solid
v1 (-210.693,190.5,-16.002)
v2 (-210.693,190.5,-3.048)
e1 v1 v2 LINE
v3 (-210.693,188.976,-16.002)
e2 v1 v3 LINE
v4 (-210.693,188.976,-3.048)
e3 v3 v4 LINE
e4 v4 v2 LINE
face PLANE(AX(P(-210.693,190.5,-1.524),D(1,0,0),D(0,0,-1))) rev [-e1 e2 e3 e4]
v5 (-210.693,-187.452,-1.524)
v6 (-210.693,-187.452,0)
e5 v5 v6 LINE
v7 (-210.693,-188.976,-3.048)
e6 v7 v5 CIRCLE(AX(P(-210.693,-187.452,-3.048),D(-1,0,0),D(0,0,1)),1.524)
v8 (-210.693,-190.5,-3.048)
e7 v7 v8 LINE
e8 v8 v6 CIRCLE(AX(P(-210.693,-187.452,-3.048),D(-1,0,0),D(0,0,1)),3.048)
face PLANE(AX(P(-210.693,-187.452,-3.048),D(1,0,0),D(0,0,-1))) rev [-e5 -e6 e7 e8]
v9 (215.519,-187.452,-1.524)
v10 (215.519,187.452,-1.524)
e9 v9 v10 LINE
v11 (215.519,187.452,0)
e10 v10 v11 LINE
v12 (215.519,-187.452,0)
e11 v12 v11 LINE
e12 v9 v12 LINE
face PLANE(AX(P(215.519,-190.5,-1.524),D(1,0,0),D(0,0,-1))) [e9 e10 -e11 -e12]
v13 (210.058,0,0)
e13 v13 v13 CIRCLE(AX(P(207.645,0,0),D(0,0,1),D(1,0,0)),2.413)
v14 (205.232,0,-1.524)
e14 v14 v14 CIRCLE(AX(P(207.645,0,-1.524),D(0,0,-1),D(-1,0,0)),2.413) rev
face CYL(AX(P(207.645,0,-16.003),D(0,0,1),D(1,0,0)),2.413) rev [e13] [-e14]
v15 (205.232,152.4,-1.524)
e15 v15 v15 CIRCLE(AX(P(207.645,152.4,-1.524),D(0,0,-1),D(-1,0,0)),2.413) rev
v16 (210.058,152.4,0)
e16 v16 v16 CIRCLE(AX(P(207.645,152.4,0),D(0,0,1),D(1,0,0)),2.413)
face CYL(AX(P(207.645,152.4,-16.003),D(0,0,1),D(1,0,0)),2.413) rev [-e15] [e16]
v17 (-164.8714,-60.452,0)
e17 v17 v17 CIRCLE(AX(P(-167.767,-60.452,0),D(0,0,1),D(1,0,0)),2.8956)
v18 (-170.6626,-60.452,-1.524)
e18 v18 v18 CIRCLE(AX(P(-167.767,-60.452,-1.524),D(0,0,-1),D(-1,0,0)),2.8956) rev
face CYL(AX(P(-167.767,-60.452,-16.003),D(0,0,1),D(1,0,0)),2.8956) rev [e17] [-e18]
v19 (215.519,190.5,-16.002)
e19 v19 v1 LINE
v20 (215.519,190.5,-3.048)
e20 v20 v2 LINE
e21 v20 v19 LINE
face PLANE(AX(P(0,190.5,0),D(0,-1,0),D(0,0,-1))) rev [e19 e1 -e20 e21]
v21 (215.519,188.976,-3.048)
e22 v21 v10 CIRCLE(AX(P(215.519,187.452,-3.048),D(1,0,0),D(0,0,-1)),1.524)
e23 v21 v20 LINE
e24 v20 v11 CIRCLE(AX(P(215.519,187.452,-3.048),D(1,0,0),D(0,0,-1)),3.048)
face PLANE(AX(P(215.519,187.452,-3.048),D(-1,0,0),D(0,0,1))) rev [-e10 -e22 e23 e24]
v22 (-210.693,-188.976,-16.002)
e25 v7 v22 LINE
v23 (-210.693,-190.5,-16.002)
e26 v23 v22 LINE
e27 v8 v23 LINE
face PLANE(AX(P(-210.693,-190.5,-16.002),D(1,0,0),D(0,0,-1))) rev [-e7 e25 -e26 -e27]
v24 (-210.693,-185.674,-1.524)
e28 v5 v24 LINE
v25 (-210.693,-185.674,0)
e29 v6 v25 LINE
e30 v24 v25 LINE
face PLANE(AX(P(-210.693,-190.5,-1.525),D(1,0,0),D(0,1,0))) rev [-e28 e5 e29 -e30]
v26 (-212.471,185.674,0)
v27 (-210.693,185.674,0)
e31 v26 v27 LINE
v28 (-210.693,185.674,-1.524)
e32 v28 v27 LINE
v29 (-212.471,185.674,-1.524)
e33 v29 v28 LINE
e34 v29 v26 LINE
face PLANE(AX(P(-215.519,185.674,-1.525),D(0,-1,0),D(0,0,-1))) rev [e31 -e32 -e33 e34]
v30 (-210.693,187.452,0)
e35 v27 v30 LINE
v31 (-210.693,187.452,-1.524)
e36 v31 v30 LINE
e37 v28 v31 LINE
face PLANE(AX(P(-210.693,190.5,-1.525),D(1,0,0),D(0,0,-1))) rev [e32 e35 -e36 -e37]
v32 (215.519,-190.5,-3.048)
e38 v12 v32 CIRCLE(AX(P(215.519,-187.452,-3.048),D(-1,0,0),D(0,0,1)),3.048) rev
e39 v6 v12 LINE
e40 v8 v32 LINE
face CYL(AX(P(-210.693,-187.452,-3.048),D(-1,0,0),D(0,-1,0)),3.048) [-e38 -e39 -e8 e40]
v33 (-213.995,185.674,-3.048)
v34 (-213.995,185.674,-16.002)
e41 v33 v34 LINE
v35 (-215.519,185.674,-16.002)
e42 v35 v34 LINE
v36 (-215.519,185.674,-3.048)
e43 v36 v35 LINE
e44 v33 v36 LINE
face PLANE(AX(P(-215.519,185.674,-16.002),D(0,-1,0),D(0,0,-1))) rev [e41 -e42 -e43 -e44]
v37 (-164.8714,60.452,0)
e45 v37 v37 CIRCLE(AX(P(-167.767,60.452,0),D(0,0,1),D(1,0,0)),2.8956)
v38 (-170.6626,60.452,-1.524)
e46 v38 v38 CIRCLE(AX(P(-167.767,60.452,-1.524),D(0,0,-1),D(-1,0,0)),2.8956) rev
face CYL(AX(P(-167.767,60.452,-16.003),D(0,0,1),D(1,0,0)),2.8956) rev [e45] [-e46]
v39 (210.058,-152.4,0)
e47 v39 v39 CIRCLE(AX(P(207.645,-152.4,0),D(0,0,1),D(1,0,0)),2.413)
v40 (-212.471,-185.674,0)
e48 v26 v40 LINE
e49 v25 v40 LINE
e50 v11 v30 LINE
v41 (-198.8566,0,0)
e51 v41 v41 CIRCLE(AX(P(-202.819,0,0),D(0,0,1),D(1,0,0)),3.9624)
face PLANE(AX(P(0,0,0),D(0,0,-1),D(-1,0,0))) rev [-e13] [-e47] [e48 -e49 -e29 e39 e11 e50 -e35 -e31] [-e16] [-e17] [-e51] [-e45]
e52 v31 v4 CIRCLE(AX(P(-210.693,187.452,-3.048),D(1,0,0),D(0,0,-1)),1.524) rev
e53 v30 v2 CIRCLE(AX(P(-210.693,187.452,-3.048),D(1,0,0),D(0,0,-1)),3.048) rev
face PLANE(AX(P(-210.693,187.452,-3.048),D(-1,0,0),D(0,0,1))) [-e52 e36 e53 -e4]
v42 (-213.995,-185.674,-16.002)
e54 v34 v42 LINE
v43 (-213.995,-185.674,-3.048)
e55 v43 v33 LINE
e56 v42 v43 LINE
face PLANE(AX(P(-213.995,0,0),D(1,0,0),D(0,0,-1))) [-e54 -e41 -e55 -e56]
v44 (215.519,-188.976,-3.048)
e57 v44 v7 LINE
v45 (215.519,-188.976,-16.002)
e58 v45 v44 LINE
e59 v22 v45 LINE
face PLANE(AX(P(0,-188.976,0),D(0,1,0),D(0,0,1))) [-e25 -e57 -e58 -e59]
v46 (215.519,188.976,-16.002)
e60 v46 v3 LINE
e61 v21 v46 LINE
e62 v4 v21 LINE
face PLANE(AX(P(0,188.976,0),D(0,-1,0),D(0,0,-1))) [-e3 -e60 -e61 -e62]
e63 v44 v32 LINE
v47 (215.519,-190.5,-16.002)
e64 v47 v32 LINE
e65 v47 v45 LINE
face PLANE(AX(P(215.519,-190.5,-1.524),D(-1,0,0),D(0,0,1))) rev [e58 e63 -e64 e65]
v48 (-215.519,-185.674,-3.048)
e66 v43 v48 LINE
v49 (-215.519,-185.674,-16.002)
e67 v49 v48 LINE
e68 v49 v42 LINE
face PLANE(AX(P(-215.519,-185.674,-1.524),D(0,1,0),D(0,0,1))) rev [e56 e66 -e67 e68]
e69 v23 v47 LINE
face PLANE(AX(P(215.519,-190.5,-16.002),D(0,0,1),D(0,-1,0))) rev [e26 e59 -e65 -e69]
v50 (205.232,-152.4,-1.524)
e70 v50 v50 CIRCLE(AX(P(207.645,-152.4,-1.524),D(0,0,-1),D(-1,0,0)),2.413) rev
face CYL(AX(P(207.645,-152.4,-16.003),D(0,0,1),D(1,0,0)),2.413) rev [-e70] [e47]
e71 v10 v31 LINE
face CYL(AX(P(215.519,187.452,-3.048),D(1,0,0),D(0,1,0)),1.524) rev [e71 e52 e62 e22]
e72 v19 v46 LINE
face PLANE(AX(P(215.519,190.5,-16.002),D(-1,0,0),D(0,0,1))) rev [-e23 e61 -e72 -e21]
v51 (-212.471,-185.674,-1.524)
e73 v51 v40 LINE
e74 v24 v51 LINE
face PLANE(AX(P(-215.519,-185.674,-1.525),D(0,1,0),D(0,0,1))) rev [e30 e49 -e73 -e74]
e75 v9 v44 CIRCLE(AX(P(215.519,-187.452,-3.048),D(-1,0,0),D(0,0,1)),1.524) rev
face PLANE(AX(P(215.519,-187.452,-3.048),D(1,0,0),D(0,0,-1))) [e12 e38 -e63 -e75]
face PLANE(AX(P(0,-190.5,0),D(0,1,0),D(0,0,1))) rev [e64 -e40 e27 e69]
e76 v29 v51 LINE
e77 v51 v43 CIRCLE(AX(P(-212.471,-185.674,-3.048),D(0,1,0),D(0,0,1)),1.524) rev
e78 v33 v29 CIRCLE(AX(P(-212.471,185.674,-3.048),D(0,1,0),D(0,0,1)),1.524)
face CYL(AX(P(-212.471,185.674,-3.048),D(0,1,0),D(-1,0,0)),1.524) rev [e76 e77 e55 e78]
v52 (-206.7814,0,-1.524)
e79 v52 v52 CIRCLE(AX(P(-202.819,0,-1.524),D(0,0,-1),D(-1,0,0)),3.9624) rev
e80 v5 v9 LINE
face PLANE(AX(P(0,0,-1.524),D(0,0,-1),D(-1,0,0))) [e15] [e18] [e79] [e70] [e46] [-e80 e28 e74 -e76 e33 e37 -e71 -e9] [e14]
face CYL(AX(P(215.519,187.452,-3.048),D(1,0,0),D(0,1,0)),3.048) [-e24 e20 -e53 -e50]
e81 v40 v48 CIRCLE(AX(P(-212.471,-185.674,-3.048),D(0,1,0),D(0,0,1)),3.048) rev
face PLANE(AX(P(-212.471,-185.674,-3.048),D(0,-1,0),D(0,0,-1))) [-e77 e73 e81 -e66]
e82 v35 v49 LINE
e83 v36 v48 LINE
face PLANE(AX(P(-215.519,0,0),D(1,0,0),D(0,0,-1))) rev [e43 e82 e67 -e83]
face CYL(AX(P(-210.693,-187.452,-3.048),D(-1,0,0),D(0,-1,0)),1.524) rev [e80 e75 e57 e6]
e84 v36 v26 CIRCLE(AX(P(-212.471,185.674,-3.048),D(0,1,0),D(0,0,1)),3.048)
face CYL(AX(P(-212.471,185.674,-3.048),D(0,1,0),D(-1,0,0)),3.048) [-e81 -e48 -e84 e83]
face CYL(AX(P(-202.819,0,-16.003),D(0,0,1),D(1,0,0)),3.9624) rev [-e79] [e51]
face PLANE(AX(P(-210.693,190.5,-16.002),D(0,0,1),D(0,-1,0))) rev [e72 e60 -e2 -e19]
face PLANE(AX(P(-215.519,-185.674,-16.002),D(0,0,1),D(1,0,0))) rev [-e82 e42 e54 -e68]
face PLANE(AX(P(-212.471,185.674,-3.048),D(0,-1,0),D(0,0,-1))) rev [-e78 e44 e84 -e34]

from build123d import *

# Parameters (mm, degrees)
CROQUIS1_W                         = 431.038
CROQUIS1_H                         = 381
BRIDA_BASE1_DEPTH                  = 1.524
CORTAR_EXTRUIR1_REACH              = 289.647
CROQUIS6_W                         = 4.826
CROQUIS6_H                         = 4.826
BRIDA_DE_ARISTA1_STRIP_W           = 9.144
BRIDA_DE_ARISTA1_STRIP_H           = 1.524
BRIDA_DE_ARISTA1_STRIP_CUT_DEPTH   = 426.212
BRIDA_DE_ARISTA1_STRIP_2_W         = 9.144
BRIDA_DE_ARISTA1_STRIP_2_H         = 1.524
BRIDA_DE_ARISTA1_STRIP_CUT_2_DEPTH = 426.212
BRIDA_DE_ARISTA1_STRIP_3_W         = 9.144
BRIDA_DE_ARISTA1_STRIP_3_H         = 1.524
BRIDA_DE_ARISTA1_STRIP_CUT_3_DEPTH = 371.348
BRIDA_DE_ARISTA1_DEPTH             = 426.212
BRIDA_DE_ARISTA1_BEND_DEPTH        = 426.212
BRIDA_DE_ARISTA1_BEND_2_DEPTH      = 371.348
CORTAR_EXTRUIR2_REACH              = 290.088
CROQUIS16_R                        = 3.9624
CROQUIS16_R_2                      = 2.8956
CROQUIS16_R_3                      = 2.413


# Sheet-metal steps are written as plain solids
with BuildPart() as part:
    # Croquis1 → Brida base1 (new body)
    with BuildSketch(Plane.XY):
        Rectangle(CROQUIS1_W, CROQUIS1_H)
    extrude(amount=-BRIDA_BASE1_DEPTH)

    # Croquis6 → Cortar-Extruir1 (cut, up to next)
    with BuildSketch(Plane.XY, mode=Mode.PRIVATE) as cortar_extruir1_sk1:
        with Locations((-213.106, 188.087)):
            Rectangle(CROQUIS6_W, CROQUIS6_H)
    cortar_extruir1_tool1 = extrude(cortar_extruir1_sk1.sketch, amount=-CORTAR_EXTRUIR1_REACH, mode=Mode.PRIVATE) & part.part
    # Croquis6 → Cortar-Extruir1 (cut, up to next)
    with BuildSketch(Plane.XY, mode=Mode.PRIVATE) as cortar_extruir1_sk2:
        with Locations((-213.106, -188.087)):
            Rectangle(CROQUIS6_W, CROQUIS6_H)
    cortar_extruir1_tool2 = extrude(cortar_extruir1_sk2.sketch, amount=-CORTAR_EXTRUIR1_REACH, mode=Mode.PRIVATE) & part.part
    add(cortar_extruir1_tool1.solids().sort_by_distance((-213.106, 188.087, 0))[0], mode=Mode.SUBTRACT)
    add(cortar_extruir1_tool2.solids().sort_by_distance((-213.106, -188.087, 0))[0], mode=Mode.SUBTRACT)

    # Brida de arista1 strip (across the edge) → Brida de arista1 strip cut (cut)
    with BuildSketch(Plane(origin=(-210.693, 190.5, -1.524), x_dir=(0, -1, 0), z_dir=(1, 0, 0))):
        with Locations((-1.524, -0.762)):
            Rectangle(BRIDA_DE_ARISTA1_STRIP_W, BRIDA_DE_ARISTA1_STRIP_H)
    extrude(amount=BRIDA_DE_ARISTA1_STRIP_CUT_DEPTH, mode=Mode.SUBTRACT)

    # Brida de arista1 strip 2 (across the edge) → Brida de arista1 strip cut 2 (cut)
    with BuildSketch(Plane(origin=(215.519, -190.5, -1.524), x_dir=(0, 1, 0), z_dir=(-1, 0, 0))):
        with Locations((-1.524, -0.762)):
            Rectangle(BRIDA_DE_ARISTA1_STRIP_2_W, BRIDA_DE_ARISTA1_STRIP_2_H)
    extrude(amount=BRIDA_DE_ARISTA1_STRIP_CUT_2_DEPTH, mode=Mode.SUBTRACT)

    # Brida de arista1 strip 3 (across the edge) → Brida de arista1 strip cut 3 (cut)
    with BuildSketch(Plane(origin=(-215.519, -185.674, -1.524), x_dir=(1, 0, 0), z_dir=(0, 1, 0))):
        with Locations((-1.524, -0.762)):
            Rectangle(BRIDA_DE_ARISTA1_STRIP_3_W, BRIDA_DE_ARISTA1_STRIP_3_H)
    extrude(amount=BRIDA_DE_ARISTA1_STRIP_CUT_3_DEPTH, mode=Mode.SUBTRACT)

    # Brida de arista1 section (across the edge) → Brida de arista1 (add)
    with BuildSketch(Plane(origin=(-210.693, 190.5, -1.524), x_dir=(0, -1, 0), z_dir=(1, 0, 0))):
        with BuildLine():
            Line((0, 1.524), (0, 14.478))
            Line((0, 14.478), (1.524, 14.478))
            Line((1.524, 14.478), (1.524, 1.524))
            ThreePointArc((1.524, 1.524), (1.970369265, 0.446369265), (3.048, 0))
            Line((3.048, 0), (3.048, -1.524))
            ThreePointArc((3.048, -1.524), (0.892738531, -0.631261469), (0, 1.524))
        make_face()
    extrude(amount=BRIDA_DE_ARISTA1_DEPTH)

    # Brida de arista1 section 2 (across the edge) → Brida de arista1 bend (add)
    with BuildSketch(Plane(origin=(215.519, -190.5, -1.524), x_dir=(0, 1, 0), z_dir=(-1, 0, 0))):
        with BuildLine():
            Line((0, 1.524), (0, 14.478))
            Line((0, 14.478), (1.524, 14.478))
            Line((1.524, 14.478), (1.524, 1.524))
            ThreePointArc((1.524, 1.524), (1.970369265, 0.446369265), (3.048, 0))
            Line((3.048, 0), (3.048, -1.524))
            ThreePointArc((3.048, -1.524), (0.892738531, -0.631261469), (0, 1.524))
        make_face()
    extrude(amount=BRIDA_DE_ARISTA1_BEND_DEPTH)

    # Brida de arista1 section 3 (across the edge) → Brida de arista1 bend 2 (add)
    with BuildSketch(Plane(origin=(-215.519, -185.674, -1.524), x_dir=(1, 0, 0), z_dir=(0, 1, 0))):
        with BuildLine():
            Line((0, 1.524), (0, 14.478))
            Line((0, 14.478), (1.524, 14.478))
            Line((1.524, 14.478), (1.524, 1.524))
            ThreePointArc((1.524, 1.524), (1.970369265, 0.446369265), (3.048, 0))
            Line((3.048, 0), (3.048, -1.524))
            ThreePointArc((3.048, -1.524), (0.892738531, -0.631261469), (0, 1.524))
        make_face()
    extrude(amount=BRIDA_DE_ARISTA1_BEND_2_DEPTH)

    # Croquis16 → Cortar-Extruir2 (cut, up to next)
    with BuildSketch(Plane.XY, mode=Mode.PRIVATE) as cortar_extruir2_sk1:
        with Locations((-202.819, 0)):
            Circle(CROQUIS16_R)
    cortar_extruir2_tool1 = extrude(cortar_extruir2_sk1.sketch, amount=-CORTAR_EXTRUIR2_REACH, mode=Mode.PRIVATE) & part.part
    # Croquis16 → Cortar-Extruir2 (cut, up to next)
    with BuildSketch(Plane.XY, mode=Mode.PRIVATE) as cortar_extruir2_sk2:
        with Locations((-167.767, 60.452)):
            Circle(CROQUIS16_R_2)
    cortar_extruir2_tool2 = extrude(cortar_extruir2_sk2.sketch, amount=-CORTAR_EXTRUIR2_REACH, mode=Mode.PRIVATE) & part.part
    # Croquis16 → Cortar-Extruir2 (cut, up to next)
    with BuildSketch(Plane.XY, mode=Mode.PRIVATE) as cortar_extruir2_sk3:
        with Locations((-167.767, -60.452)):
            Circle(CROQUIS16_R_2)
    cortar_extruir2_tool3 = extrude(cortar_extruir2_sk3.sketch, amount=-CORTAR_EXTRUIR2_REACH, mode=Mode.PRIVATE) & part.part
    # Croquis16 → Cortar-Extruir2 (cut, up to next)
    with BuildSketch(Plane.XY, mode=Mode.PRIVATE) as cortar_extruir2_sk4:
        with Locations((207.645, 152.4)):
            Circle(CROQUIS16_R_3)
    cortar_extruir2_tool4 = extrude(cortar_extruir2_sk4.sketch, amount=-CORTAR_EXTRUIR2_REACH, mode=Mode.PRIVATE) & part.part
    # Croquis16 → Cortar-Extruir2 (cut, up to next)
    with BuildSketch(Plane.XY, mode=Mode.PRIVATE) as cortar_extruir2_sk5:
        with Locations((207.645, 0)):
            Circle(CROQUIS16_R_3)
    cortar_extruir2_tool5 = extrude(cortar_extruir2_sk5.sketch, amount=-CORTAR_EXTRUIR2_REACH, mode=Mode.PRIVATE) & part.part
    # Croquis16 → Cortar-Extruir2 (cut, up to next)
    with BuildSketch(Plane.XY, mode=Mode.PRIVATE) as cortar_extruir2_sk6:
        with Locations((207.645, -152.4)):
            Circle(CROQUIS16_R_3)
    cortar_extruir2_tool6 = extrude(cortar_extruir2_sk6.sketch, amount=-CORTAR_EXTRUIR2_REACH, mode=Mode.PRIVATE) & part.part
    add(cortar_extruir2_tool1.solids().sort_by_distance((-202.819, 0, 0))[0], mode=Mode.SUBTRACT)
    add(cortar_extruir2_tool2.solids().sort_by_distance((-167.767, 60.452, 0))[0], mode=Mode.SUBTRACT)
    add(cortar_extruir2_tool3.solids().sort_by_distance((-167.767, -60.452, 0))[0], mode=Mode.SUBTRACT)
    add(cortar_extruir2_tool4.solids().sort_by_distance((207.645, 152.4, 0))[0], mode=Mode.SUBTRACT)
    add(cortar_extruir2_tool5.solids().sort_by_distance((207.645, 0, 0))[0], mode=Mode.SUBTRACT)
    add(cortar_extruir2_tool6.solids().sort_by_distance((207.645, -152.4, 0))[0], mode=Mode.SUBTRACT)


solid = part.part
